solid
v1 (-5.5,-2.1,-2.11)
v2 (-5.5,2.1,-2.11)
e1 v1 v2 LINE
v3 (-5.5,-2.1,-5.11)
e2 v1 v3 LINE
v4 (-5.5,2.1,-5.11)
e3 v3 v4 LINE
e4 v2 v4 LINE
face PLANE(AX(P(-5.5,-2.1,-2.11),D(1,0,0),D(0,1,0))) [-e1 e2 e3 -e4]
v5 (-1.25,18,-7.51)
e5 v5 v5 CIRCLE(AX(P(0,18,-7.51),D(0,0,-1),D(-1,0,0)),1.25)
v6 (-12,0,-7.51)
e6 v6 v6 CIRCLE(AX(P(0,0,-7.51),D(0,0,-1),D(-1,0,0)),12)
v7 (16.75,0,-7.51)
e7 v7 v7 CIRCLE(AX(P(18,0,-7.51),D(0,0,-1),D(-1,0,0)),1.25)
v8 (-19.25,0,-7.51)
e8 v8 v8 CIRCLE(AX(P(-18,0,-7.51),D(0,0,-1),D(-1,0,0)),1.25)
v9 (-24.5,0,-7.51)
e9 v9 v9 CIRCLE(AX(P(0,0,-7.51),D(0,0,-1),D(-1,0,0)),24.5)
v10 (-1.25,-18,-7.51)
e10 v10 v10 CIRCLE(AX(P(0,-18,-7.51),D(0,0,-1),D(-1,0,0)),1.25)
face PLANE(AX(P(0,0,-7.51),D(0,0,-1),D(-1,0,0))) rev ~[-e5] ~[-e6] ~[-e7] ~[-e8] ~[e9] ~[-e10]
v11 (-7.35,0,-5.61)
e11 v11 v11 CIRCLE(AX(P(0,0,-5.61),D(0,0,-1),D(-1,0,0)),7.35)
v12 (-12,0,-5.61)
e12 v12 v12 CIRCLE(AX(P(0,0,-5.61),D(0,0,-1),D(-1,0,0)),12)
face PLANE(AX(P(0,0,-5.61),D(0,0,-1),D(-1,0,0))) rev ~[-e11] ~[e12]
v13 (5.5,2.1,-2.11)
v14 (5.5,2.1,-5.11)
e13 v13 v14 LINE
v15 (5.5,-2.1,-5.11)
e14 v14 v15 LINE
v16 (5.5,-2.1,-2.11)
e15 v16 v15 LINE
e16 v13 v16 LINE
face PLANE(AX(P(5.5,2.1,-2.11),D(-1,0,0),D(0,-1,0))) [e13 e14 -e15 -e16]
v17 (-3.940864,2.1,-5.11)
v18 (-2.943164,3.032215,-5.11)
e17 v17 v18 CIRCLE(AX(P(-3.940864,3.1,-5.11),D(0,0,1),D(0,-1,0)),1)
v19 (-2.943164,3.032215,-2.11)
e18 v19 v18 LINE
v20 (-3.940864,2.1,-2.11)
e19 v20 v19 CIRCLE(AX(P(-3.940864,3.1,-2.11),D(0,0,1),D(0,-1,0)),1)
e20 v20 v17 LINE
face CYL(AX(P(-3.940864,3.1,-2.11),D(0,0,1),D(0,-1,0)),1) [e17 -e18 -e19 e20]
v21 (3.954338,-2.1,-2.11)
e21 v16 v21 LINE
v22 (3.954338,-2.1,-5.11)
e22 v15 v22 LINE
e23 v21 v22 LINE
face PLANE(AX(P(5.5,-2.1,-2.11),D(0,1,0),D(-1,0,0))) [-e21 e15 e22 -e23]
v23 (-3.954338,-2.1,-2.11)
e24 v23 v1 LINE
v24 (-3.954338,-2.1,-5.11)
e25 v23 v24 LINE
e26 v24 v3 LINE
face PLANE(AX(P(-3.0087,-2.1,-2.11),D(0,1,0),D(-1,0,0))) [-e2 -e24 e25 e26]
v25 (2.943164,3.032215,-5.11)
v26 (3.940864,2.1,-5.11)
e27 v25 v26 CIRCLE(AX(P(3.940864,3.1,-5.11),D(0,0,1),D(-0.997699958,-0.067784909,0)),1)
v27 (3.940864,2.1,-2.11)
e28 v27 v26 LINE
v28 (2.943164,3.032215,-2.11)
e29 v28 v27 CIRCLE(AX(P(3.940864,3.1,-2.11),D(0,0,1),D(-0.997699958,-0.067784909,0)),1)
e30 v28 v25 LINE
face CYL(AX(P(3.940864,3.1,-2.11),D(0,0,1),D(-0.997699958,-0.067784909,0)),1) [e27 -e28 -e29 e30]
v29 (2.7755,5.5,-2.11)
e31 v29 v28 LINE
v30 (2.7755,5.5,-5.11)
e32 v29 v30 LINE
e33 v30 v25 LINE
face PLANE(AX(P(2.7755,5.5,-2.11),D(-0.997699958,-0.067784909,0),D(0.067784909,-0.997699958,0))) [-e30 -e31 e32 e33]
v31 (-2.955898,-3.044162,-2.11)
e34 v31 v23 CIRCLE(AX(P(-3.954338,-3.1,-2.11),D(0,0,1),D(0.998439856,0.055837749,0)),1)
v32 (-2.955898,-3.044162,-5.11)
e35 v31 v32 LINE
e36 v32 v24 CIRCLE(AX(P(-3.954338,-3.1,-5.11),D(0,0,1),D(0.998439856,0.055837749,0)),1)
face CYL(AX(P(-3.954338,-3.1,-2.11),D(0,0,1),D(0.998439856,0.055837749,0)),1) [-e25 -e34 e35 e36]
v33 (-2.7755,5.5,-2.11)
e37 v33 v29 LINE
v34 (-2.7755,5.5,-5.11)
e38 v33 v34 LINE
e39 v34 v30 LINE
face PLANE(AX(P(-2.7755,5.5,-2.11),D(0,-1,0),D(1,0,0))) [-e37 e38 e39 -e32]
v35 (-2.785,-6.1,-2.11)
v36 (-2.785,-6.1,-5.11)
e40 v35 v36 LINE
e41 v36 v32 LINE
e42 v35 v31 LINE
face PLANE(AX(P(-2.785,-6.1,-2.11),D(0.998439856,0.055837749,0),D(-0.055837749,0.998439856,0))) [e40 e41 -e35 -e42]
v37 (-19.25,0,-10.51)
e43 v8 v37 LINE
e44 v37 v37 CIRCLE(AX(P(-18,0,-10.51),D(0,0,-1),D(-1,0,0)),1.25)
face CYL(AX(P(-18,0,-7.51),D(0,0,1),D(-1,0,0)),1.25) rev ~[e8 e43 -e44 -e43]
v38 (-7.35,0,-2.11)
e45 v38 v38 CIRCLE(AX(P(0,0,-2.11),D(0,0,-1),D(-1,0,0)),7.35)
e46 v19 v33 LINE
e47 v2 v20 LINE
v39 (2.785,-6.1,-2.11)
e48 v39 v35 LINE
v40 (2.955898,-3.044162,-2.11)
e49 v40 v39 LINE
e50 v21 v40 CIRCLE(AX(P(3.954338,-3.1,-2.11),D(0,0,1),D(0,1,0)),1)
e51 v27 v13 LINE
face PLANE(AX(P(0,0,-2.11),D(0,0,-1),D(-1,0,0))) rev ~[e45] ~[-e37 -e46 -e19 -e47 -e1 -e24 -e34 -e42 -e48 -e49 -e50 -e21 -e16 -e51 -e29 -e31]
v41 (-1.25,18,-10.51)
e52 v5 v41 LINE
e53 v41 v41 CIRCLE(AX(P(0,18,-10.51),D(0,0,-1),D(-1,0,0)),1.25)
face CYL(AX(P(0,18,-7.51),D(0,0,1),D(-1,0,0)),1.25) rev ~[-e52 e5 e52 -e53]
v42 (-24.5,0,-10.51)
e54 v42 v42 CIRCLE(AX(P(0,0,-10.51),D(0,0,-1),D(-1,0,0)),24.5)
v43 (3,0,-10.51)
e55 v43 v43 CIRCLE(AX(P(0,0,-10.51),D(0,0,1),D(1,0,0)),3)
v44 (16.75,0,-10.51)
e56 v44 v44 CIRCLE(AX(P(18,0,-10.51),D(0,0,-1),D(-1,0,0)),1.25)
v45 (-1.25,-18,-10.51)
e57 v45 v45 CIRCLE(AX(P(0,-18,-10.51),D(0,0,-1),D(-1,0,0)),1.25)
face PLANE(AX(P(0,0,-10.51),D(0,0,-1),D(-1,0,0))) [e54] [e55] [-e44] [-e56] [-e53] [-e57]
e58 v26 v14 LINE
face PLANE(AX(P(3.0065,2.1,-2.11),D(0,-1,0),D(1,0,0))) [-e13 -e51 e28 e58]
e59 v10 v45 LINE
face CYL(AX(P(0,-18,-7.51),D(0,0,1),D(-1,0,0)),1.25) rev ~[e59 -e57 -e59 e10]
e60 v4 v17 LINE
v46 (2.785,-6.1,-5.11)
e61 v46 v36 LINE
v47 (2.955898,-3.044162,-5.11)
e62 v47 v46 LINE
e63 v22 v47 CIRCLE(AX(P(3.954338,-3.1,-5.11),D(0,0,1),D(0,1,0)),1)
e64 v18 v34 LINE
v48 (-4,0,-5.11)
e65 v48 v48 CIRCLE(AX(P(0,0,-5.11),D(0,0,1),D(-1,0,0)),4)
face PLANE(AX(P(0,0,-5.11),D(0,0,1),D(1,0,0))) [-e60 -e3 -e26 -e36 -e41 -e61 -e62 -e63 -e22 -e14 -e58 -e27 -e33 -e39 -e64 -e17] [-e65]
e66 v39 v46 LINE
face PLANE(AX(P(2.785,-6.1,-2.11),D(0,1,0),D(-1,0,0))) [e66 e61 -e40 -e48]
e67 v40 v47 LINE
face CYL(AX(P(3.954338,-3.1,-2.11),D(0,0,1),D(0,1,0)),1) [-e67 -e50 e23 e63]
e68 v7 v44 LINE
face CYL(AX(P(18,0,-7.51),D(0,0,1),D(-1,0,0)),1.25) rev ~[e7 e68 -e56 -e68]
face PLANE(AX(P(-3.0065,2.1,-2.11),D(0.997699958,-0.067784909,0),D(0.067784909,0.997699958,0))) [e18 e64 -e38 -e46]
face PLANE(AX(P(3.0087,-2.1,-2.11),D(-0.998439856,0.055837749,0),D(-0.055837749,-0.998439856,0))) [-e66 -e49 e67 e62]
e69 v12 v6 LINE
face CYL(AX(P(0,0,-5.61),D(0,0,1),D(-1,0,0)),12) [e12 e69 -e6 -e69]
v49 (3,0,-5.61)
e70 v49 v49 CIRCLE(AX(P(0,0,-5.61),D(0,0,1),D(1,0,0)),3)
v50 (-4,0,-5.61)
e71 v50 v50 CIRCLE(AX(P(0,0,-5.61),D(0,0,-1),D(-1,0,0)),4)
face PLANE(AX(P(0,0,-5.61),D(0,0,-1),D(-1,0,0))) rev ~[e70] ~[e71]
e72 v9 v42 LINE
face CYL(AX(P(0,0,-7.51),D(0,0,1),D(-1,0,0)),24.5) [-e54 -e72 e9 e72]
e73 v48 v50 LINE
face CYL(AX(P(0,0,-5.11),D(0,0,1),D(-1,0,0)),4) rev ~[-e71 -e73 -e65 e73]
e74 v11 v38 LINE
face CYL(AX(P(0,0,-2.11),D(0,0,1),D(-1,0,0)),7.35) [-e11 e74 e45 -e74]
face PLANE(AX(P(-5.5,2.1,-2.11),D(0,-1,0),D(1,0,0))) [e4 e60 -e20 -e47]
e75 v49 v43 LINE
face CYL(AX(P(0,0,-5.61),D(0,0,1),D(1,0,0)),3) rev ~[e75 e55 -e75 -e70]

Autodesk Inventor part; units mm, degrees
ref_plane "YZ Plane" through (0, 0, 0) normal (1, 0, 0) x (0, 1, 0)
ref_plane "XZ Plane" through (0, 0, 0) normal (0, 1, 0) x (-1, 0, 0)
ref_plane "XY Plane" through (0, 0, 0) normal (0, 0, 1) x (1, 0, 0)
sketch "스케치1" plane through (0, 0, 0) normal (0, 0, 1) x (1, 0, 0)
  circle A0 centre (0, 0) radius 2.5
  line L0 (-6.35, 0) -> (6.35, 0) construction
  line L1 (-6.35, -1.9) -> (6.35, -1.9)
  line L2 (6.35, 1.9) -> (-6.35, 1.9)
  arc A1 (-6.35, 1.9) -> (-6.35, -1.9) centre (-6.35, 0) ccw
  arc A2 (6.35, -1.9) -> (6.35, 1.9) centre (6.35, 0) ccw
  line L3 (0, 14.5) -> (0, -14.5) construction
  circle A3 centre (0, 14.5) radius 0.5
  circle A4 centre (0, -14.5) radius 0.5
  circle A5 centre (6.35, 0) radius 0.5
  circle A6 centre (-6.35, 0) radius 0.5
  circle A7 centre (-4.25, 0) radius 0.5
  circle A8 centre (4.25, 0) radius 0.5
  line L4 (0, -1.9) -> (0, -18.5)
  line L5 (0, 1.9) -> (0, 15.9)
  arc A9 (1.9954, 14.0355) -> (-1.9954, 14.0355) centre (0, 13.9) ccw
  arc A10 (-1.9969, -16.6117) -> (1.9969, -16.6117) centre (0, -16.5) ccw
  circle A11 centre (0, 0) radius 3.4
  line L6 (-1.9954, 14.0355) -> (-2.8196, 1.9)
  line L7 (1.9954, 14.0355) -> (2.8196, 1.9)
  line L8 (-2.8196, -1.9) -> (-1.9969, -16.6117)
  line L9 (2.8196, -1.9) -> (1.9969, -16.6117)
  circle A12 centre (0, 12.5) radius 0.5
  circle A13 centre (0, 10.5) radius 0.5
  circle A14 centre (0, 8.5) radius 0.5
  circle A15 centre (0, 6.5) radius 0.5
  circle A16 centre (0, 4.5) radius 0.5
  circle A17 centre (0, 0) radius 2.35
  circle A18 centre (0, -16.5) radius 0.5
  circle A19 centre (0, -12.5) radius 0.5
  circle A20 centre (0, -10.5) radius 0.5
  circle A21 centre (0, -8.5) radius 0.5
  circle A22 centre (0, -6.5) radius 0.5
  circle A23 centre (0, -4.5) radius 0.5
  dimension "d0" = 5
  dimension "d1" = 1.9
  dimension "d2" = 16.5
  dimension "d3" = 29
  dimension "d4" = 1
  dimension "d5" = 1
  dimension "d6" = 1
  dimension "d7" = 1
  dimension "d10" = 2.1
  dimension "d17" = 2.1
  dimension "d24" = 16.6
  dimension "d25" = 14
  dimension "d26" = 4
  dimension "d27" = 4
  dimension "d28" = 6.8
  dimension "d31" = 2
  dimension "d36" = 4.7
  dimension "d39" = 2
  dimension "d46" = 2
extrude "돌출1" add sketch "스케치1" along normal blind 2.2 contours A0 L1 A17 L2 | A0 L2 A11 L1 | L2 A17 L5 A0 | A0 L5 A11 L2 | L1 A11 L4 A0 | A0 L4 A17 L1 | L5 A17 L2 A0 | A0 L2 A11 L5 | A17 L1 L2 | L2 L5 A17 | L4 A11 L1 A0 | A0 L1 A17 L4 | A17 L4 L1 | L2 A17 L1 A0 | A0 L1 A11 L2 | L5 L2 A17 | A17 L1 L4
extrude "돌출2" add sketch "스케치1" against normal blind 2.11 contours A0 L1 A17 L2 | A0 L2 A11 L1 | L2 A17 L5 A0 | A0 L5 A11 L2 | L1 A11 L4 A0 | A0 L4 A17 L1 | L5 A17 L2 A0 | A0 L2 A11 L5 | L2 A2 L1 A11 | A11 L5 A16 A15 A14 A13 A12 A3 A9 L7 | A17 L1 L2 | L2 L5 A17 | L4 A11 L1 A0 | A0 L1 A17 L4 | A17 L4 L1 | L9 A10 L4 A18 A4 A19 A20 A21 A22 A23 A11 | L2 A17 L1 A0 | A0 L1 A11 L2 | L5 L2 A17 | A11 L6 A9 L5 A3 A12 A13 A14 A15 A16 | A17 L1 L4 | L4 A23 A22 A21 A20 A19 A4 A18 A10 L8 A11 | A11 L1 A1 L2
extrude "돌출3" cut sketch "스케치1" along normal blind 3.65 contours A17 L1 L2 | L2 L5 A17 | A17 L4 L1 | L5 L2 A17 | A17 L1 L4
sketch "스케치2" plane through (0, 0, 0) normal (0, 0, 1) x (1, 0, 0)
  circle A0 centre (0, 0) radius 1.25
  dimension "d57" = 2.5
extrude "돌출4" cut sketch "스케치2" against normal blind 7.6
sketch "스케치3" plane through (0, 0, -2.11) normal (0, 0, -1) x (-1, 0, 0)
  circle A0 centre (0, 0) radius 2.25
  dimension "d60" = 4.5
extrude "돌출5" cut sketch "스케치3" against normal blind 1
sketch "스케치4" plane through (0, 0, -2.11) normal (0, 0, -1) x (-1, 0, 0)
  point P0 (0, 0)
sketch "스케치5" plane through (0, 0, -2.11) normal (0, 0, -1) x (-1, 0, 0)
  circle A0 centre (0, 0) radius 3.4
  circle A1 centre (0, 0) radius 2.25
  dimension "d63" = 4.5
  dimension "d64" = 6.8
extrude "돌출6" add sketch "스케치5" along normal blind 0.4
sketch "스케치6" plane through (0, 0, -2.11) normal (0, 0, -1) x (-1, 0, 0)
  line L0 (0.9014, 15.3127) -> (-1.0592, 15.3127)
  line L1 (-1.0592, 15.3127) -> (-1.0592, 3.6394)
  line L2 (-1.0592, 3.6394) -> (0.9014, 3.6394)
  line L3 (0.9014, 3.6394) -> (0.9014, 15.3127)
  line L4 (1.0141, -3.7747) -> (-1.0592, -3.7747)
  line L5 (-1.0592, -3.7747) -> (-1.0592, -17.386)
  line L6 (-1.0592, -17.386) -> (1.0141, -17.386)
  line L7 (1.0141, -17.386) -> (1.0141, -3.7747)
  point P0 (0, 0)
extrude "돌출7" add sketch "스케치6" against normal blind 2.11
sketch "스케치7" plane through (0, 0, -2.11) normal (0, 0, -1) x (-1, 0, 0)
  circle A0 centre (0, 14.3) radius 0.5
  arc A1 (1.9954, 14.0355) -> (-1.9954, 14.0355) centre (0, 13.9) ccw projected
  line L0 (0, 0) -> (0, 0.7105)
  line L1 (0, 0) -> (0.8275, 0)
  circle A2 centre (0, 12.3) radius 0.5
  circle A3 centre (0, 10.3) radius 0.5
  circle A4 centre (0, 8.3) radius 0.5
  circle A5 centre (0, 6.3) radius 0.5
  circle A6 centre (0, 4.3) radius 0.5
  line L2 (0, 15.9) -> (3.4178, 15.9)
  arc A7 (1.9954, 14.0355) -> (-1.9954, 14.0355) centre (0, 13.9) ccw projected
  circle A8 centre (0, -16.9) radius 0.5
  arc A9 (-1.9969, -16.6117) -> (1.9969, -16.6117) centre (0, -16.5) ccw projected
  circle A10 centre (0, -14.9) radius 0.5
  circle A11 centre (0, -12.9) radius 0.5
  circle A12 centre (0, -10.9) radius 0.5
  circle A13 centre (0, -8.9) radius 0.5
  circle A14 centre (0, -6.9) radius 0.5
  circle A15 centre (0, -4.9) radius 0.5
  point P0 (0, -18.5)
  dimension "d69" = 1
  dimension "d73" = 2
  dimension "d78" = 1.6
  dimension "d79" = 1
  dimension "d80" = 1.6
  dimension "d86" = 2
extrude "돌출8" cut sketch "스케치7" against normal blind 2.11
sketch "스케치9" plane through (0, 0, -2.11) normal (0, 0, -1) x (-1, 0, 0)
  circle A0 centre (0, 8.3) radius 0.5 projected
  line L0 (0.5, 8.3) -> (3.8465, 8.3)
  line L1 (3.8465, 8.3) -> (3.8465, 17.7965)
  line L2 (3.8465, 17.7965) -> (-4.3088, 17.7965)
  line L3 (-4.3088, 17.7965) -> (-4.3088, 8.3)
  line L4 (-4.3088, 8.3) -> (0.2806, 8.3)
  circle A1 centre (0, -8.9) radius 0.5 projected
  line L5 (0, -8.9) -> (5.2333, -8.9)
  line L6 (5.2333, -8.9) -> (5.2333, -19.7775)
  line L7 (5.2333, -19.7775) -> (-4.9031, -19.7775)
  line L8 (-4.9031, -19.7775) -> (-4.9031, -8.9)
  line L9 (-4.9031, -8.9) -> (0, -8.9)
  point P0 (0, 0)
  point P1 (0.5, -8.9)
  point P2 (-0.5, -8.9)
  point P3 (-0.5, 8.3)
extrude "돌출9" cut sketch "스케치9" against normal blind 10 contours A0 L4 L3 L2 L1 L0 | L5 L6 L7 L8 L9 A1
sketch "스케치10" plane through (0, 0, -2.11) normal (0, 0, -1) x (-1, 0, 0)
  line L0 (-0.0004, 7.8) -> (4.3151, 7.8)
  line L1 (4.3151, 7.8) -> (3.7805, 10.6296)
  line L2 (3.7805, 10.6296) -> (-3.3513, 10.6296)
  line L3 (-3.3513, 10.6296) -> (-3.4414, 7.8)
  line L4 (-3.4414, 7.8) -> (-0.0004, 7.8)
  arc A0 (-0.5, 8.3) -> (0.5, 8.3) centre (0, 8.3) ccw projected
  arc A1 (0.5, -8.9) -> (-0.5, -8.9) centre (0, -8.9) ccw projected
  line L5 (0, -8.4) -> (4.5069, -8.4)
  line L6 (4.5069, -8.4) -> (4.5069, -10.1694)
  line L7 (4.5069, -10.1694) -> (-4.0138, -10.1694)
  line L8 (-4.0138, -10.1694) -> (-4.0138, -8.4)
  line L9 (-4.0138, -8.4) -> (0, -8.4)
  point P0 (0, 0)
extrude "돌출10" cut sketch "스케치10" against normal blind 10
fillet "모깎기1" radius 2 4 edges at (2.4189, 7.8, -1.055) (-2.4189, 7.8, -1.055) (-2.4561, -8.4, -1.055) (2.4561, -8.4, -1.055)
sketch "스케치11" plane through (0, 0, -2.11) normal (0, 0, -1) x (-1, 0, 0)
  line L0 (-6.35, -1.9) -> (-2.8196, -1.9) projected
  line L1 (-2.8196, 1.9) -> (-6.35, 1.9) projected
  circle A0 centre (0, 6.3) radius 0.5 projected
  circle A1 centre (0, -6.9) radius 0.5 projected
  line L2 (2.8196, 1.9) -> (2.5455, 5.9355) projected
  line L3 (-2.5455, 5.9355) -> (-2.8196, 1.9) projected
  line L4 (0.5501, 7.8) -> (-0.5501, 7.8) projected
  line L5 (-2.8196, -1.9) -> (-2.5617, -6.5117) projected
  line L6 (2.5617, -6.5117) -> (2.8196, -1.9) projected
  point P0 (0, 0)
  point P1 (-4.5848, -1.9)
  point P2 (-4.5848, 1.9)
  point P3 (0, 7.8)
  dimension "d95" = 3.8
  dimension "d96" = 6.3
  dimension "d97" = 6.9
  dimension "d98" = 7.77
  dimension "d99" = 7.8
  dimension "d100" = 6.401
sketch "스케치12" plane through (0, 0, -2.11) normal (0, 0, -1) x (-1, 0, 0)
  line L0 (2.5785, 5.3) -> (-2.5887, 5.3)
  line L1 (-2.5455, 5.9355) -> (-2.8196, 1.9) projected
  circle A0 centre (0, 4.3) radius 0.5 projected
  line L2 (3.3006, -5.9) -> (-2.5959, -5.9)
  line L3 (-2.8196, -1.9) -> (-2.5617, -6.5117) projected
  circle A1 centre (0, -4.9) radius 0.5 projected
  line L4 (2.8196, 1.9) -> (6.35, 1.9) projected
  line L5 (5.3, 1.9) -> (5.3, -1.9)
  circle A2 centre (4.25, 0) radius 0.5 projected
  line L6 (-6.35, 1.9) -> (-2.8196, 1.9) projected
  line L7 (-5.3, 1.9) -> (-5.3, -2.6397)
  circle A3 centre (-4.25, 0) radius 0.5 projected
  line L8 (5.3, 1.9) -> (9.4862, 1.9)
  line L9 (9.4862, 1.9) -> (9.4862, -2.8158)
  line L10 (9.4862, -2.8158) -> (5.3, -2.8158)
  line L11 (5.3, -2.8158) -> (5.3, 1.9)
  line L12 (3.3006, -5.9) -> (-3.636, -5.9)
  line L13 (-3.636, -5.9) -> (-3.636, -9.5734)
  line L14 (-3.636, -9.5734) -> (3.3006, -9.5734)
  line L15 (3.3006, -9.5734) -> (3.3006, -5.9)
  line L16 (-5.3, -2.6397) -> (-8.4677, -2.6397)
  line L17 (-8.4677, -2.6397) -> (-8.4677, 1.9)
  line L18 (-8.4677, 1.9) -> (-5.3, 1.9)
  line L19 (-5.3, 1.9) -> (-5.3, -2.6397)
  line L20 (-2.5887, 5.3) -> (3.3006, 5.3)
  line L21 (3.3006, 5.3) -> (3.3006, 8.0343)
  line L22 (3.3006, 8.0343) -> (-2.5887, 8.0343)
  line L23 (-2.5887, 8.0343) -> (-2.5887, 5.3)
  point P0 (0, 0)
  point P1 (-0.0051, 5.3)
  point P2 (-2.5617, -5.9)
  point P3 (-2.5959, -5.9)
  dimension "d101" = 1
  dimension "d102" = 1
  dimension "d104" = 1.05
  dimension "d105" = 1.05
extrude "돌출11" cut sketch "스케치12" against normal blind 10 contours L0 L23 L22 L21 L20 | L15 L14 L13 L12 L2 | L4 L8 L9 L10 L11 L5 | L6 L7 L16 L17 L18
sketch "스케치14" plane through (0, 0, -2.11) normal (0, 0, -1) x (-1, 0, 0)
  line L0 (2.5887, 5.3) -> (-2.5887, 5.3) projected
  line L1 (-2.5887, 5.3) -> (-2.8196, 1.9) projected
  arc A0 (2.8196, 1.9) -> (-2.8196, 1.9) centre (0, 0) ccw projected
  line L2 (2.8196, 1.9) -> (2.5887, 5.3) projected
  circle A1 centre (0, 4.3) radius 0.5 projected
  circle A2 centre (0, 0) radius 3.4 projected
  circle A3 centre (0, 0) radius 2.25 projected
  line L3 (5.3, -1.9) -> (5.3, 1.9) projected
  line L4 (5.3, 1.9) -> (2.8196, 1.9) projected
  arc A4 (2.8196, -1.9) -> (2.8196, 1.9) centre (0, 0) ccw projected
  line L5 (2.8196, -1.9) -> (5.3, -1.9) projected
  circle A5 centre (4.25, 0) radius 0.5 projected
  line L6 (-2.5959, -5.9) -> (2.5959, -5.9) projected
  line L7 (2.5959, -5.9) -> (2.8196, -1.9) projected
  arc A6 (-2.8196, -1.9) -> (2.8196, -1.9) centre (0, 0) ccw projected
  line L8 (-2.8196, -1.9) -> (-2.5959, -5.9) projected
  circle A7 centre (0, -4.9) radius 0.5 projected
  line L9 (-5.3, 1.9) -> (-5.3, -1.9) projected
  line L10 (-5.3, -1.9) -> (-2.8196, -1.9) projected
  arc A8 (-2.8196, 1.9) -> (-2.8196, -1.9) centre (0, 0) ccw projected
  line L11 (-2.8196, 1.9) -> (-5.3, 1.9) projected
  circle A9 centre (-4.25, 0) radius 0.5 projected
  circle A10 centre (0, 0) radius 1.25 projected
  circle A11 centre (0, 0) radius 2.25 projected
  circle A12 centre (0, 0) radius 7.35
  point P0 (2.8196, -1.9)
  dimension "d111" = 14.7
sketch "스케치15" plane through (0, 0, -2.51) normal (0, 0, -1) x (-1, 0, 0)
  line L0 (-8.2432, 8.5445) -> (15.2986, 8.5445)
  line L1 (15.2986, 8.5445) -> (15.2986, -14.1463)
  line L2 (15.2986, -14.1463) -> (-8.2432, -14.1463)
  line L3 (-8.2432, -14.1463) -> (-8.2432, 8.5445)
  point P0 (0, 0)
extrude "돌출12" cut sketch "스케치15" along normal mid plane 10
extrude "돌출13" add sketch "스케치14" along normal blind 3 contours A12
sketch "스케치16" plane through (0, 0, -5.11) normal (0, 0, -1) x (-1, 0, 0)
  circle A0 centre (0, 0) radius 4
  circle A1 centre (0, 0) radius 7.35
  circle A2 centre (0, 0) radius 7.35 projected
  dimension "d114" = 8
extrude "돌출14" add sketch "스케치16" along normal blind 0.5
sketch "스케치17" plane through (0, 0, -2.11) normal (0, 0, 1) x (1, 0, 0)
  circle A0 centre (0, 0) radius 7.35 projected
  line L0 (2.5887, 5.3) -> (-2.5887, 5.3) projected
  line L1 (2.8196, 1.9) -> (2.5887, 5.3) projected
  line L2 (5.3, 1.9) -> (2.8196, 1.9) projected
  line L3 (5.3, -1.9) -> (5.3, 1.9) projected
  line L4 (2.8196, -1.9) -> (5.3, -1.9) projected
  line L5 (2.5959, -5.9) -> (2.8196, -1.9) projected
  line L6 (-2.5959, -5.9) -> (2.5959, -5.9) projected
  line L7 (-2.8196, -1.9) -> (-2.5959, -5.9) projected
  line L8 (-5.3, -1.9) -> (-2.8196, -1.9) projected
  line L9 (-5.3, 1.9) -> (-5.3, -1.9) projected
  line L10 (-2.8196, 1.9) -> (-5.3, 1.9) projected
  line L11 (-2.5887, 5.3) -> (-2.8196, 1.9) projected
  line L12 (-2.7755, 5.5) -> (2.7755, 5.5)
  line L13 (2.7755, 5.5) -> (3.0065, 2.1)
  line L14 (3.0065, 2.1) -> (5.5, 2.1)
  line L15 (5.5, 2.1) -> (5.5, -2.1)
  line L16 (5.5, -2.1) -> (3.0087, -2.1)
  line L17 (3.0087, -2.1) -> (2.785, -6.1)
  line L18 (2.785, -6.1) -> (-2.785, -6.1)
  line L19 (-2.785, -6.1) -> (-3.0087, -2.1)
  line L20 (-3.0087, -2.1) -> (-5.5, -2.1)
  line L21 (-5.5, -2.1) -> (-5.5, 2.1)
  line L22 (-5.5, 2.1) -> (-3.0065, 2.1)
  line L23 (-3.0065, 2.1) -> (-2.7755, 5.5)
  dimension "d117" = 0.2
extrude "돌출15" cut sketch "스케치17" against normal blind 3 contours L1 L2 L3 L4 L5 L6 L7 L8 L9 L10 L11 L0 | L12 L13 L14 L15 L16 L17 L18 L19 L20 L21 L22 L23
fillet "모깎기2" radius 1 4 edges at (-3.0065, 2.1, -3.61) (3.0065, 2.1, -3.61) (3.0087, -2.1, -3.61) (-3.0087, -2.1, -3.61)
sketch "스케치18" plane through (0, 0, -5.61) normal (0, 0, -1) x (-1, 0, 0)
  circle A0 centre (0, 0) radius 12
  dimension "d121" = 24
extrude "돌출16" add sketch "스케치18" along normal blind 1.9
sketch "스케치19" plane through (0, 0, -7.51) normal (0, 0, -1) x (-1, 0, 0)
  circle A0 centre (0, 0) radius 24.5
  circle A1 centre (0, 18) radius 1.25
  circle A2 centre (-18, 0) radius 1.25
  circle A3 centre (0, -18) radius 1.25
  circle A4 centre (18, 0) radius 1.25
  dimension "d124" = 49
  dimension "d125" = 2.5
  dimension "d126" = 18
  dimension "d129" = 360
extrude "돌출17" add sketch "스케치19" along normal blind 3
sketch "스케치20" plane through (0, 0, -5.61) normal (0, 0, 1) x (1, 0, 0)
  circle A0 centre (0, 0) radius 4 projected
  circle A1 centre (0, 0) radius 3
  dimension "d133" = 6
extrude "돌출18" cut sketch "스케치20" against normal blind 16 contours A1
properties part number "180도 서보모터 십자축"
